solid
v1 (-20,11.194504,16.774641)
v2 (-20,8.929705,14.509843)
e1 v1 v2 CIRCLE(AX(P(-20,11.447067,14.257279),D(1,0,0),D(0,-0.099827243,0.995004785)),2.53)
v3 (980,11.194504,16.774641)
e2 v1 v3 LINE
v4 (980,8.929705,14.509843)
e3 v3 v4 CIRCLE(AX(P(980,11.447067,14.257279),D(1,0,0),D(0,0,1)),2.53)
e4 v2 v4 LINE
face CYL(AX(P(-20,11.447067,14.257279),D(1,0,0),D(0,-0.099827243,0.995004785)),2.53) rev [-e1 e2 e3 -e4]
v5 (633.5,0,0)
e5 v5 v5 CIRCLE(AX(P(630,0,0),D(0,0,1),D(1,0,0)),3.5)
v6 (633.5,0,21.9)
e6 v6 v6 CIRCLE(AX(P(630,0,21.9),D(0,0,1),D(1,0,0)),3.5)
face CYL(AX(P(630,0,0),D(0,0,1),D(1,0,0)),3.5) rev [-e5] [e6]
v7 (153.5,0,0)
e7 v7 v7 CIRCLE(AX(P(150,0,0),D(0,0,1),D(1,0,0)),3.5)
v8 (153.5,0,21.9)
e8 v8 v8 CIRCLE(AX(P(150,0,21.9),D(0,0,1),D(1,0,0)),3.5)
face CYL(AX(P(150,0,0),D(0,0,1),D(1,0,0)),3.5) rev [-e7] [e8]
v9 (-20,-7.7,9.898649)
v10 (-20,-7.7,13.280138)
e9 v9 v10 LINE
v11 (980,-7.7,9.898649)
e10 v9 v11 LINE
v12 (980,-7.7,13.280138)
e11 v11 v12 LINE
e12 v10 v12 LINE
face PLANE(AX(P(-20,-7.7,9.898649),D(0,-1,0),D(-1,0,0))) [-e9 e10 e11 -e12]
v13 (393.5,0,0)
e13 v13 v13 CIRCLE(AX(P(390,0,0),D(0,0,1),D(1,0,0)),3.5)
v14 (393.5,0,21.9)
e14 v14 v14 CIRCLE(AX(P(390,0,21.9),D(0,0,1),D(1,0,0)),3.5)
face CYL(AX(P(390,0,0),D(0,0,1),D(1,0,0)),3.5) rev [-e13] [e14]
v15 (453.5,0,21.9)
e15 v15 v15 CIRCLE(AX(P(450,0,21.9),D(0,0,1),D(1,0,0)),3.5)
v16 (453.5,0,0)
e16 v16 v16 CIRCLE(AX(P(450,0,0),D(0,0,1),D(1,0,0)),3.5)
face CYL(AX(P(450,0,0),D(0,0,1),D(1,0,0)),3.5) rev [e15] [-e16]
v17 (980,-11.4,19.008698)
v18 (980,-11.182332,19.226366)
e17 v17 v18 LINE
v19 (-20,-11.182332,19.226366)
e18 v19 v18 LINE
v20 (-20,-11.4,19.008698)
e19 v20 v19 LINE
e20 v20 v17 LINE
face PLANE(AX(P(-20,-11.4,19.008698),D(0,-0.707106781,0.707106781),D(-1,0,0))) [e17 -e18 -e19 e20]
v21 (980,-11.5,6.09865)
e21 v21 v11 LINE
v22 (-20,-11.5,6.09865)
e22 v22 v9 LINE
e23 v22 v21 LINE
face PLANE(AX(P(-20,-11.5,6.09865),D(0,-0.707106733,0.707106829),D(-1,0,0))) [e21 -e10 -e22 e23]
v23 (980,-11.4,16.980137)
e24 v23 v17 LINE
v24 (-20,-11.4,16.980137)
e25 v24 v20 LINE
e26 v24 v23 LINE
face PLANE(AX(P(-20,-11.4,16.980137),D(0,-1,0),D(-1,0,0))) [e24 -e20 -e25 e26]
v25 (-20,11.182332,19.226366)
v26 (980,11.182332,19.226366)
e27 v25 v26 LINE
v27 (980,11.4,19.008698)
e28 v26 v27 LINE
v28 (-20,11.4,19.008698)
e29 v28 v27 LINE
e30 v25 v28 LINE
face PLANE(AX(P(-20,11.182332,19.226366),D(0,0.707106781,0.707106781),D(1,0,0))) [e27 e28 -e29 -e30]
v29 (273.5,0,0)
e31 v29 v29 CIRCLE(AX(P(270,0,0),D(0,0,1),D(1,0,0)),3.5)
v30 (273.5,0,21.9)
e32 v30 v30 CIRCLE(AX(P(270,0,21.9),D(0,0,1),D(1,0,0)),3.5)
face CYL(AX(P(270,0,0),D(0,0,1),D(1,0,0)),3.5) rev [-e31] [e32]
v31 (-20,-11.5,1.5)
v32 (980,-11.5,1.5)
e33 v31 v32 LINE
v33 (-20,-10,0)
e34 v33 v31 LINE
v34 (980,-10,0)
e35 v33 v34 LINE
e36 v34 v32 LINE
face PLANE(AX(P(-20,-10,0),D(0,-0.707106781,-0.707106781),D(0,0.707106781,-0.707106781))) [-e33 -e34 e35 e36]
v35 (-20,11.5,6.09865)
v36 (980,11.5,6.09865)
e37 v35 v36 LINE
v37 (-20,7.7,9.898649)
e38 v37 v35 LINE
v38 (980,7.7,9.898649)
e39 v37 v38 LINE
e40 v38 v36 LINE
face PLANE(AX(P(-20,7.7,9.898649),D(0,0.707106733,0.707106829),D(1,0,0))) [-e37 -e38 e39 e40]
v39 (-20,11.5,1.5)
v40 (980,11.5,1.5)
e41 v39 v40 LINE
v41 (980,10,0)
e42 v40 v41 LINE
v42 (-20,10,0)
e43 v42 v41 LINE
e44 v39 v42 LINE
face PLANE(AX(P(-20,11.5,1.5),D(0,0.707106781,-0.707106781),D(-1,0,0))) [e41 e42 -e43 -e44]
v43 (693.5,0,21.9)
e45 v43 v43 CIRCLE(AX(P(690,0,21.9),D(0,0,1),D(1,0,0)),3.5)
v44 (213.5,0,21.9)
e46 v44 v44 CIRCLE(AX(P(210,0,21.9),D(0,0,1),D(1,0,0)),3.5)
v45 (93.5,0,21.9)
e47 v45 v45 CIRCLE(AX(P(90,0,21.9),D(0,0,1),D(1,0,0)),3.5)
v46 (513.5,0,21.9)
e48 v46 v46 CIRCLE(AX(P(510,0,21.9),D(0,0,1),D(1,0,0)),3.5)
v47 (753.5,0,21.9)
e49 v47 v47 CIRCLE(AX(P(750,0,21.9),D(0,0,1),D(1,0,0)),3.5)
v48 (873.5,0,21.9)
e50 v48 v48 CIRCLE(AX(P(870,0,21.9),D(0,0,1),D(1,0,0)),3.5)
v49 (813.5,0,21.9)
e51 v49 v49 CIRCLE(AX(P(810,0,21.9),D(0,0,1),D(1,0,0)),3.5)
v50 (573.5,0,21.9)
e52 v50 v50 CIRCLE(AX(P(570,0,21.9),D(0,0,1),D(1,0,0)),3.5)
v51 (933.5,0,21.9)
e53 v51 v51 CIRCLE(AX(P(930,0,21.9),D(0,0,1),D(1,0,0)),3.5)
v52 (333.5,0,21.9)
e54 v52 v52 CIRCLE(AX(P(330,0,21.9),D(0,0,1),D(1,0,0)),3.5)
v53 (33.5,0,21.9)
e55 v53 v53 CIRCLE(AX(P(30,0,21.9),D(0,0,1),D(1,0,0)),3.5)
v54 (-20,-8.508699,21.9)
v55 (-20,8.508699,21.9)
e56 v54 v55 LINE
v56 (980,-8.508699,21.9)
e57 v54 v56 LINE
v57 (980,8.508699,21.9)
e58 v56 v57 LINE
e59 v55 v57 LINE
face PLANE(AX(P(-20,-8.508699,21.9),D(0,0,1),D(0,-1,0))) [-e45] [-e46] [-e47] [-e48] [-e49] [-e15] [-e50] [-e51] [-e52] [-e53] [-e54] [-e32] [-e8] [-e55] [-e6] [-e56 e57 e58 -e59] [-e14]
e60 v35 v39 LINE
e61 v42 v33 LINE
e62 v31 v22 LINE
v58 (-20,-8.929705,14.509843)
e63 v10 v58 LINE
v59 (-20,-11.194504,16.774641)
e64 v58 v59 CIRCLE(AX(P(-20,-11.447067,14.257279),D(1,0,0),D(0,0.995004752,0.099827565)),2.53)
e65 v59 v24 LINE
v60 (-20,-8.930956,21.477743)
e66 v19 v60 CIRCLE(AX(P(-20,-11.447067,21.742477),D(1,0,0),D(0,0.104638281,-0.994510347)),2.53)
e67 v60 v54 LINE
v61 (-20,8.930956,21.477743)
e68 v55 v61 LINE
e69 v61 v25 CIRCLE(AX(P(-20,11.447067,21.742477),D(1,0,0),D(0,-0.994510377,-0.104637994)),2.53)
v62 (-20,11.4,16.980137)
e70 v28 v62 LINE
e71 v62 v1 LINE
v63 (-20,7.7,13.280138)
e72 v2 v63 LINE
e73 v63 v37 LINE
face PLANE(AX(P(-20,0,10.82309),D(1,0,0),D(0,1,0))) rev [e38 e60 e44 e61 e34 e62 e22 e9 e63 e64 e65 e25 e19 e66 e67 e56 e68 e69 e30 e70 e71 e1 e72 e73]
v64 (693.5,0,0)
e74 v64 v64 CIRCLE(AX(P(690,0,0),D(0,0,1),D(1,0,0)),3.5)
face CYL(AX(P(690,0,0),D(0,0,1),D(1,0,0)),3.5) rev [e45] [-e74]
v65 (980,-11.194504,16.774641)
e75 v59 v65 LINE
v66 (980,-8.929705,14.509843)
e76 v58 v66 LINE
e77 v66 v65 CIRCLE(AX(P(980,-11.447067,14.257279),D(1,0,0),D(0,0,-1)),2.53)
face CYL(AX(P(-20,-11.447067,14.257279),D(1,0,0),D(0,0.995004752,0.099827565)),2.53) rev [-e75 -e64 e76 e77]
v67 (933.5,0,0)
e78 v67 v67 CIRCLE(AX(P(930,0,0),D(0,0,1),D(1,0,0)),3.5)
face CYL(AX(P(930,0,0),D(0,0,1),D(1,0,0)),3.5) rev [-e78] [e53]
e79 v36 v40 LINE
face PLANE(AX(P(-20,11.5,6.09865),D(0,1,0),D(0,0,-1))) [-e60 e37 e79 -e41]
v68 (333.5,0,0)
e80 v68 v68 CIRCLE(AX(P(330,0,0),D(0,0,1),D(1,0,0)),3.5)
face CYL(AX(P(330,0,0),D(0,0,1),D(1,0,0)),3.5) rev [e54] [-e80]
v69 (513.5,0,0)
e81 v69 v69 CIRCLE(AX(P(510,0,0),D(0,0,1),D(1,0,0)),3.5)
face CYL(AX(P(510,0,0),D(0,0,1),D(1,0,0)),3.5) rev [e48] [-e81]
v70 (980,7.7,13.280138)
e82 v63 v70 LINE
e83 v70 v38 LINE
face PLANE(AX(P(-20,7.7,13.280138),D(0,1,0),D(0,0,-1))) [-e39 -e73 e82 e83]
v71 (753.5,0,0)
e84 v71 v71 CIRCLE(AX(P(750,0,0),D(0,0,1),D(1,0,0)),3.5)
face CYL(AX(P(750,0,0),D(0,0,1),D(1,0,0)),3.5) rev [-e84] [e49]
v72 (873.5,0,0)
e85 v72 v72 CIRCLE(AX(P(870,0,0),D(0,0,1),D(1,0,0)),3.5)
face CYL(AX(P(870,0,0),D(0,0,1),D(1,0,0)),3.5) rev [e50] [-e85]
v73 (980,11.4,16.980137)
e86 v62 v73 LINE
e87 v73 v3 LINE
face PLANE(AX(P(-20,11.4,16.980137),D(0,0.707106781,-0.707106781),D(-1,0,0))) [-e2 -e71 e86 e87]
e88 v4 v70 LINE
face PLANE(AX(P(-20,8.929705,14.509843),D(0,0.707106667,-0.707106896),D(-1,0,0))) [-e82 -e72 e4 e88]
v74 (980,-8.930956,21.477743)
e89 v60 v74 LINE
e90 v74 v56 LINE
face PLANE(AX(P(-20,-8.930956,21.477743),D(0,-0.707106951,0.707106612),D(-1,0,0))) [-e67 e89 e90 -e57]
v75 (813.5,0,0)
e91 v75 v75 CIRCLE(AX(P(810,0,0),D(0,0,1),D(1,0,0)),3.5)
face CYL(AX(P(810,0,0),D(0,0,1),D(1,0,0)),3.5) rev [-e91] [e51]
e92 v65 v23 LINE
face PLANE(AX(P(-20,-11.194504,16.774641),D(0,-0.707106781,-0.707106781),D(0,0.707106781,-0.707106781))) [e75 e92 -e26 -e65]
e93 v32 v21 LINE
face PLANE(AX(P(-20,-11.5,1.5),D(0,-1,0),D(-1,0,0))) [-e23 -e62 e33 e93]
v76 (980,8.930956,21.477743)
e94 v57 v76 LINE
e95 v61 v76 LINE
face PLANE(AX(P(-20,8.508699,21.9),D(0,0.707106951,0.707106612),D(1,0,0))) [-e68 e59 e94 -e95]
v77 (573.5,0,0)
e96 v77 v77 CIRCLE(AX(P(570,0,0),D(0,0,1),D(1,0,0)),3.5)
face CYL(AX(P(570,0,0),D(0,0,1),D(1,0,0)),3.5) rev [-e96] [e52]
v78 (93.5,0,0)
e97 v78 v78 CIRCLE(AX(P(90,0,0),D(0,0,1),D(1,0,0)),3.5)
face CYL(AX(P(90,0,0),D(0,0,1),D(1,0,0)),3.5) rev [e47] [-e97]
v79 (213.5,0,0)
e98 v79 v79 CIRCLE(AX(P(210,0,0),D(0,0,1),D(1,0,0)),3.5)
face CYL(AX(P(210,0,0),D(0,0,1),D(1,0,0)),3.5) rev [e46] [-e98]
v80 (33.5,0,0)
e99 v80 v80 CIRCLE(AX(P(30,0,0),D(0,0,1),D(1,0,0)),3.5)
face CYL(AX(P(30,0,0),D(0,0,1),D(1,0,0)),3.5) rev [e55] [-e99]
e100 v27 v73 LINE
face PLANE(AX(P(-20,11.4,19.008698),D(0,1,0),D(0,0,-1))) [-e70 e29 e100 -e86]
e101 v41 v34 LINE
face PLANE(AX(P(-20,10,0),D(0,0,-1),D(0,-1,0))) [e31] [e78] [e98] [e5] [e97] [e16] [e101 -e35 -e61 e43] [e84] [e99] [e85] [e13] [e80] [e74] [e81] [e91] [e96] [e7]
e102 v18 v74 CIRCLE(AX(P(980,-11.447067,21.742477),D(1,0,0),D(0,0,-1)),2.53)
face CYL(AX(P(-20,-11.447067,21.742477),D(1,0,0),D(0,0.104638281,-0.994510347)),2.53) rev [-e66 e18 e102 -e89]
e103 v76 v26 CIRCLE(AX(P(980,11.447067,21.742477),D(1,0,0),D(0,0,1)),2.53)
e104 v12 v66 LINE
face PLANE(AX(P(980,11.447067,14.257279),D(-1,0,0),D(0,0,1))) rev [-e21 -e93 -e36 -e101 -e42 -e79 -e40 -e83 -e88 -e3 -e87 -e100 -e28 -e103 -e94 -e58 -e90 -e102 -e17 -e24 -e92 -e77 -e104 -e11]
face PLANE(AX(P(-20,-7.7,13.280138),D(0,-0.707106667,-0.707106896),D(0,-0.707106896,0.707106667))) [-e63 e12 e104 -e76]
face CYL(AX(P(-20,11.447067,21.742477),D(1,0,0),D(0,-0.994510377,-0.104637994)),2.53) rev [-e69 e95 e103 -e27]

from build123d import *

# Parameters (mm, degrees)
RESSALTO_EXTRUS_O1_DEPTH = 1000
ESBO_O2_R                = 3.5
CORTE_EXTRUS_O1_DEPTH    = 981.312123765


# Read off the part's stored shape, not the designer's step: KR25-N.step
with BuildPart() as part:
    # Esboço1 → Ressalto-extrusão1 (new body)
    with BuildSketch(Plane.ZY.offset(20)):
        with BuildLine():
            Line((0, 10), (0, -10))
            Line((0, -10), (1.5, -11.5))
            Line((1.5, -11.5), (6.0986495, -11.5))
            Line((6.0986495, -11.5), (9.898648987, -7.7))
            Line((9.898648987, -7.7), (13.280138132, -7.7))
            Line((13.280138132, -7.7), (14.509842724, -8.929704991))
            ThreePointArc((14.509842724, -8.929704991), (16.046259432, -9.658087148), (16.774641091, -11.194504091))
            Line((16.774641091, -11.194504091), (16.980137, -11.4))
            Line((16.980137, -11.4), (19.008698, -11.4))
            Line((19.008698, -11.4), (19.226365837, -11.182332163))
            ThreePointArc((19.226365837, -11.182332163), (19.953497116, -9.6580866), (21.477742889, -8.93095576))
            Line((21.477742889, -8.93095576), (21.9, -8.508698852))
            Line((21.9, -8.508698852), (21.9, 8.508698852))
            Line((21.9, 8.508698852), (21.477742889, 8.93095576))
            ThreePointArc((21.477742889, 8.93095576), (19.953497116, 9.6580866), (19.226365837, 11.182332163))
            Line((19.226365837, 11.182332163), (19.008698, 11.4))
            Line((19.008698, 11.4), (16.980137, 11.4))
            Line((16.980137, 11.4), (16.774641091, 11.194504091))
            ThreePointArc((16.774641091, 11.194504091), (16.046259432, 9.658087148), (14.509842724, 8.929704991))
            Line((14.509842724, 8.929704991), (13.280138132, 7.7))
            Line((13.280138132, 7.7), (9.898648987, 7.7))
            Line((9.898648987, 7.7), (6.0986495, 11.5))
            Line((6.0986495, 11.5), (1.5, 11.5))
            Line((1.5, 11.5), (0, 10))
        make_face()
    extrude(amount=-RESSALTO_EXTRUS_O1_DEPTH)

    # Esboço2 → Corte-extrusão1 (cut, through all)
    with BuildSketch(Plane.XY.offset(21.9)):
        with Locations((30, 0)):
            Circle(ESBO_O2_R)
        with Locations((90, 0)):
            Circle(ESBO_O2_R)
        with Locations((150, 0)):
            Circle(ESBO_O2_R)
        with Locations((210, 0)):
            Circle(ESBO_O2_R)
        with Locations((270, 0)):
            Circle(ESBO_O2_R)
        with Locations((330, 0)):
            Circle(ESBO_O2_R)
        with Locations((390, 0)):
            Circle(ESBO_O2_R)
        with Locations((450, 0)):
            Circle(ESBO_O2_R)
        with Locations((510, 0)):
            Circle(ESBO_O2_R)
        with Locations((570, 0)):
            Circle(ESBO_O2_R)
        with Locations((630, 0)):
            Circle(ESBO_O2_R)
        with Locations((690, 0)):
            Circle(ESBO_O2_R)
        with Locations((750, 0)):
            Circle(ESBO_O2_R)
        with Locations((810, 0)):
            Circle(ESBO_O2_R)
        with Locations((870, 0)):
            Circle(ESBO_O2_R)
        with Locations((930, 0)):
            Circle(ESBO_O2_R)
    extrude(amount=-CORTE_EXTRUS_O1_DEPTH, mode=Mode.SUBTRACT)


solid = part.part
